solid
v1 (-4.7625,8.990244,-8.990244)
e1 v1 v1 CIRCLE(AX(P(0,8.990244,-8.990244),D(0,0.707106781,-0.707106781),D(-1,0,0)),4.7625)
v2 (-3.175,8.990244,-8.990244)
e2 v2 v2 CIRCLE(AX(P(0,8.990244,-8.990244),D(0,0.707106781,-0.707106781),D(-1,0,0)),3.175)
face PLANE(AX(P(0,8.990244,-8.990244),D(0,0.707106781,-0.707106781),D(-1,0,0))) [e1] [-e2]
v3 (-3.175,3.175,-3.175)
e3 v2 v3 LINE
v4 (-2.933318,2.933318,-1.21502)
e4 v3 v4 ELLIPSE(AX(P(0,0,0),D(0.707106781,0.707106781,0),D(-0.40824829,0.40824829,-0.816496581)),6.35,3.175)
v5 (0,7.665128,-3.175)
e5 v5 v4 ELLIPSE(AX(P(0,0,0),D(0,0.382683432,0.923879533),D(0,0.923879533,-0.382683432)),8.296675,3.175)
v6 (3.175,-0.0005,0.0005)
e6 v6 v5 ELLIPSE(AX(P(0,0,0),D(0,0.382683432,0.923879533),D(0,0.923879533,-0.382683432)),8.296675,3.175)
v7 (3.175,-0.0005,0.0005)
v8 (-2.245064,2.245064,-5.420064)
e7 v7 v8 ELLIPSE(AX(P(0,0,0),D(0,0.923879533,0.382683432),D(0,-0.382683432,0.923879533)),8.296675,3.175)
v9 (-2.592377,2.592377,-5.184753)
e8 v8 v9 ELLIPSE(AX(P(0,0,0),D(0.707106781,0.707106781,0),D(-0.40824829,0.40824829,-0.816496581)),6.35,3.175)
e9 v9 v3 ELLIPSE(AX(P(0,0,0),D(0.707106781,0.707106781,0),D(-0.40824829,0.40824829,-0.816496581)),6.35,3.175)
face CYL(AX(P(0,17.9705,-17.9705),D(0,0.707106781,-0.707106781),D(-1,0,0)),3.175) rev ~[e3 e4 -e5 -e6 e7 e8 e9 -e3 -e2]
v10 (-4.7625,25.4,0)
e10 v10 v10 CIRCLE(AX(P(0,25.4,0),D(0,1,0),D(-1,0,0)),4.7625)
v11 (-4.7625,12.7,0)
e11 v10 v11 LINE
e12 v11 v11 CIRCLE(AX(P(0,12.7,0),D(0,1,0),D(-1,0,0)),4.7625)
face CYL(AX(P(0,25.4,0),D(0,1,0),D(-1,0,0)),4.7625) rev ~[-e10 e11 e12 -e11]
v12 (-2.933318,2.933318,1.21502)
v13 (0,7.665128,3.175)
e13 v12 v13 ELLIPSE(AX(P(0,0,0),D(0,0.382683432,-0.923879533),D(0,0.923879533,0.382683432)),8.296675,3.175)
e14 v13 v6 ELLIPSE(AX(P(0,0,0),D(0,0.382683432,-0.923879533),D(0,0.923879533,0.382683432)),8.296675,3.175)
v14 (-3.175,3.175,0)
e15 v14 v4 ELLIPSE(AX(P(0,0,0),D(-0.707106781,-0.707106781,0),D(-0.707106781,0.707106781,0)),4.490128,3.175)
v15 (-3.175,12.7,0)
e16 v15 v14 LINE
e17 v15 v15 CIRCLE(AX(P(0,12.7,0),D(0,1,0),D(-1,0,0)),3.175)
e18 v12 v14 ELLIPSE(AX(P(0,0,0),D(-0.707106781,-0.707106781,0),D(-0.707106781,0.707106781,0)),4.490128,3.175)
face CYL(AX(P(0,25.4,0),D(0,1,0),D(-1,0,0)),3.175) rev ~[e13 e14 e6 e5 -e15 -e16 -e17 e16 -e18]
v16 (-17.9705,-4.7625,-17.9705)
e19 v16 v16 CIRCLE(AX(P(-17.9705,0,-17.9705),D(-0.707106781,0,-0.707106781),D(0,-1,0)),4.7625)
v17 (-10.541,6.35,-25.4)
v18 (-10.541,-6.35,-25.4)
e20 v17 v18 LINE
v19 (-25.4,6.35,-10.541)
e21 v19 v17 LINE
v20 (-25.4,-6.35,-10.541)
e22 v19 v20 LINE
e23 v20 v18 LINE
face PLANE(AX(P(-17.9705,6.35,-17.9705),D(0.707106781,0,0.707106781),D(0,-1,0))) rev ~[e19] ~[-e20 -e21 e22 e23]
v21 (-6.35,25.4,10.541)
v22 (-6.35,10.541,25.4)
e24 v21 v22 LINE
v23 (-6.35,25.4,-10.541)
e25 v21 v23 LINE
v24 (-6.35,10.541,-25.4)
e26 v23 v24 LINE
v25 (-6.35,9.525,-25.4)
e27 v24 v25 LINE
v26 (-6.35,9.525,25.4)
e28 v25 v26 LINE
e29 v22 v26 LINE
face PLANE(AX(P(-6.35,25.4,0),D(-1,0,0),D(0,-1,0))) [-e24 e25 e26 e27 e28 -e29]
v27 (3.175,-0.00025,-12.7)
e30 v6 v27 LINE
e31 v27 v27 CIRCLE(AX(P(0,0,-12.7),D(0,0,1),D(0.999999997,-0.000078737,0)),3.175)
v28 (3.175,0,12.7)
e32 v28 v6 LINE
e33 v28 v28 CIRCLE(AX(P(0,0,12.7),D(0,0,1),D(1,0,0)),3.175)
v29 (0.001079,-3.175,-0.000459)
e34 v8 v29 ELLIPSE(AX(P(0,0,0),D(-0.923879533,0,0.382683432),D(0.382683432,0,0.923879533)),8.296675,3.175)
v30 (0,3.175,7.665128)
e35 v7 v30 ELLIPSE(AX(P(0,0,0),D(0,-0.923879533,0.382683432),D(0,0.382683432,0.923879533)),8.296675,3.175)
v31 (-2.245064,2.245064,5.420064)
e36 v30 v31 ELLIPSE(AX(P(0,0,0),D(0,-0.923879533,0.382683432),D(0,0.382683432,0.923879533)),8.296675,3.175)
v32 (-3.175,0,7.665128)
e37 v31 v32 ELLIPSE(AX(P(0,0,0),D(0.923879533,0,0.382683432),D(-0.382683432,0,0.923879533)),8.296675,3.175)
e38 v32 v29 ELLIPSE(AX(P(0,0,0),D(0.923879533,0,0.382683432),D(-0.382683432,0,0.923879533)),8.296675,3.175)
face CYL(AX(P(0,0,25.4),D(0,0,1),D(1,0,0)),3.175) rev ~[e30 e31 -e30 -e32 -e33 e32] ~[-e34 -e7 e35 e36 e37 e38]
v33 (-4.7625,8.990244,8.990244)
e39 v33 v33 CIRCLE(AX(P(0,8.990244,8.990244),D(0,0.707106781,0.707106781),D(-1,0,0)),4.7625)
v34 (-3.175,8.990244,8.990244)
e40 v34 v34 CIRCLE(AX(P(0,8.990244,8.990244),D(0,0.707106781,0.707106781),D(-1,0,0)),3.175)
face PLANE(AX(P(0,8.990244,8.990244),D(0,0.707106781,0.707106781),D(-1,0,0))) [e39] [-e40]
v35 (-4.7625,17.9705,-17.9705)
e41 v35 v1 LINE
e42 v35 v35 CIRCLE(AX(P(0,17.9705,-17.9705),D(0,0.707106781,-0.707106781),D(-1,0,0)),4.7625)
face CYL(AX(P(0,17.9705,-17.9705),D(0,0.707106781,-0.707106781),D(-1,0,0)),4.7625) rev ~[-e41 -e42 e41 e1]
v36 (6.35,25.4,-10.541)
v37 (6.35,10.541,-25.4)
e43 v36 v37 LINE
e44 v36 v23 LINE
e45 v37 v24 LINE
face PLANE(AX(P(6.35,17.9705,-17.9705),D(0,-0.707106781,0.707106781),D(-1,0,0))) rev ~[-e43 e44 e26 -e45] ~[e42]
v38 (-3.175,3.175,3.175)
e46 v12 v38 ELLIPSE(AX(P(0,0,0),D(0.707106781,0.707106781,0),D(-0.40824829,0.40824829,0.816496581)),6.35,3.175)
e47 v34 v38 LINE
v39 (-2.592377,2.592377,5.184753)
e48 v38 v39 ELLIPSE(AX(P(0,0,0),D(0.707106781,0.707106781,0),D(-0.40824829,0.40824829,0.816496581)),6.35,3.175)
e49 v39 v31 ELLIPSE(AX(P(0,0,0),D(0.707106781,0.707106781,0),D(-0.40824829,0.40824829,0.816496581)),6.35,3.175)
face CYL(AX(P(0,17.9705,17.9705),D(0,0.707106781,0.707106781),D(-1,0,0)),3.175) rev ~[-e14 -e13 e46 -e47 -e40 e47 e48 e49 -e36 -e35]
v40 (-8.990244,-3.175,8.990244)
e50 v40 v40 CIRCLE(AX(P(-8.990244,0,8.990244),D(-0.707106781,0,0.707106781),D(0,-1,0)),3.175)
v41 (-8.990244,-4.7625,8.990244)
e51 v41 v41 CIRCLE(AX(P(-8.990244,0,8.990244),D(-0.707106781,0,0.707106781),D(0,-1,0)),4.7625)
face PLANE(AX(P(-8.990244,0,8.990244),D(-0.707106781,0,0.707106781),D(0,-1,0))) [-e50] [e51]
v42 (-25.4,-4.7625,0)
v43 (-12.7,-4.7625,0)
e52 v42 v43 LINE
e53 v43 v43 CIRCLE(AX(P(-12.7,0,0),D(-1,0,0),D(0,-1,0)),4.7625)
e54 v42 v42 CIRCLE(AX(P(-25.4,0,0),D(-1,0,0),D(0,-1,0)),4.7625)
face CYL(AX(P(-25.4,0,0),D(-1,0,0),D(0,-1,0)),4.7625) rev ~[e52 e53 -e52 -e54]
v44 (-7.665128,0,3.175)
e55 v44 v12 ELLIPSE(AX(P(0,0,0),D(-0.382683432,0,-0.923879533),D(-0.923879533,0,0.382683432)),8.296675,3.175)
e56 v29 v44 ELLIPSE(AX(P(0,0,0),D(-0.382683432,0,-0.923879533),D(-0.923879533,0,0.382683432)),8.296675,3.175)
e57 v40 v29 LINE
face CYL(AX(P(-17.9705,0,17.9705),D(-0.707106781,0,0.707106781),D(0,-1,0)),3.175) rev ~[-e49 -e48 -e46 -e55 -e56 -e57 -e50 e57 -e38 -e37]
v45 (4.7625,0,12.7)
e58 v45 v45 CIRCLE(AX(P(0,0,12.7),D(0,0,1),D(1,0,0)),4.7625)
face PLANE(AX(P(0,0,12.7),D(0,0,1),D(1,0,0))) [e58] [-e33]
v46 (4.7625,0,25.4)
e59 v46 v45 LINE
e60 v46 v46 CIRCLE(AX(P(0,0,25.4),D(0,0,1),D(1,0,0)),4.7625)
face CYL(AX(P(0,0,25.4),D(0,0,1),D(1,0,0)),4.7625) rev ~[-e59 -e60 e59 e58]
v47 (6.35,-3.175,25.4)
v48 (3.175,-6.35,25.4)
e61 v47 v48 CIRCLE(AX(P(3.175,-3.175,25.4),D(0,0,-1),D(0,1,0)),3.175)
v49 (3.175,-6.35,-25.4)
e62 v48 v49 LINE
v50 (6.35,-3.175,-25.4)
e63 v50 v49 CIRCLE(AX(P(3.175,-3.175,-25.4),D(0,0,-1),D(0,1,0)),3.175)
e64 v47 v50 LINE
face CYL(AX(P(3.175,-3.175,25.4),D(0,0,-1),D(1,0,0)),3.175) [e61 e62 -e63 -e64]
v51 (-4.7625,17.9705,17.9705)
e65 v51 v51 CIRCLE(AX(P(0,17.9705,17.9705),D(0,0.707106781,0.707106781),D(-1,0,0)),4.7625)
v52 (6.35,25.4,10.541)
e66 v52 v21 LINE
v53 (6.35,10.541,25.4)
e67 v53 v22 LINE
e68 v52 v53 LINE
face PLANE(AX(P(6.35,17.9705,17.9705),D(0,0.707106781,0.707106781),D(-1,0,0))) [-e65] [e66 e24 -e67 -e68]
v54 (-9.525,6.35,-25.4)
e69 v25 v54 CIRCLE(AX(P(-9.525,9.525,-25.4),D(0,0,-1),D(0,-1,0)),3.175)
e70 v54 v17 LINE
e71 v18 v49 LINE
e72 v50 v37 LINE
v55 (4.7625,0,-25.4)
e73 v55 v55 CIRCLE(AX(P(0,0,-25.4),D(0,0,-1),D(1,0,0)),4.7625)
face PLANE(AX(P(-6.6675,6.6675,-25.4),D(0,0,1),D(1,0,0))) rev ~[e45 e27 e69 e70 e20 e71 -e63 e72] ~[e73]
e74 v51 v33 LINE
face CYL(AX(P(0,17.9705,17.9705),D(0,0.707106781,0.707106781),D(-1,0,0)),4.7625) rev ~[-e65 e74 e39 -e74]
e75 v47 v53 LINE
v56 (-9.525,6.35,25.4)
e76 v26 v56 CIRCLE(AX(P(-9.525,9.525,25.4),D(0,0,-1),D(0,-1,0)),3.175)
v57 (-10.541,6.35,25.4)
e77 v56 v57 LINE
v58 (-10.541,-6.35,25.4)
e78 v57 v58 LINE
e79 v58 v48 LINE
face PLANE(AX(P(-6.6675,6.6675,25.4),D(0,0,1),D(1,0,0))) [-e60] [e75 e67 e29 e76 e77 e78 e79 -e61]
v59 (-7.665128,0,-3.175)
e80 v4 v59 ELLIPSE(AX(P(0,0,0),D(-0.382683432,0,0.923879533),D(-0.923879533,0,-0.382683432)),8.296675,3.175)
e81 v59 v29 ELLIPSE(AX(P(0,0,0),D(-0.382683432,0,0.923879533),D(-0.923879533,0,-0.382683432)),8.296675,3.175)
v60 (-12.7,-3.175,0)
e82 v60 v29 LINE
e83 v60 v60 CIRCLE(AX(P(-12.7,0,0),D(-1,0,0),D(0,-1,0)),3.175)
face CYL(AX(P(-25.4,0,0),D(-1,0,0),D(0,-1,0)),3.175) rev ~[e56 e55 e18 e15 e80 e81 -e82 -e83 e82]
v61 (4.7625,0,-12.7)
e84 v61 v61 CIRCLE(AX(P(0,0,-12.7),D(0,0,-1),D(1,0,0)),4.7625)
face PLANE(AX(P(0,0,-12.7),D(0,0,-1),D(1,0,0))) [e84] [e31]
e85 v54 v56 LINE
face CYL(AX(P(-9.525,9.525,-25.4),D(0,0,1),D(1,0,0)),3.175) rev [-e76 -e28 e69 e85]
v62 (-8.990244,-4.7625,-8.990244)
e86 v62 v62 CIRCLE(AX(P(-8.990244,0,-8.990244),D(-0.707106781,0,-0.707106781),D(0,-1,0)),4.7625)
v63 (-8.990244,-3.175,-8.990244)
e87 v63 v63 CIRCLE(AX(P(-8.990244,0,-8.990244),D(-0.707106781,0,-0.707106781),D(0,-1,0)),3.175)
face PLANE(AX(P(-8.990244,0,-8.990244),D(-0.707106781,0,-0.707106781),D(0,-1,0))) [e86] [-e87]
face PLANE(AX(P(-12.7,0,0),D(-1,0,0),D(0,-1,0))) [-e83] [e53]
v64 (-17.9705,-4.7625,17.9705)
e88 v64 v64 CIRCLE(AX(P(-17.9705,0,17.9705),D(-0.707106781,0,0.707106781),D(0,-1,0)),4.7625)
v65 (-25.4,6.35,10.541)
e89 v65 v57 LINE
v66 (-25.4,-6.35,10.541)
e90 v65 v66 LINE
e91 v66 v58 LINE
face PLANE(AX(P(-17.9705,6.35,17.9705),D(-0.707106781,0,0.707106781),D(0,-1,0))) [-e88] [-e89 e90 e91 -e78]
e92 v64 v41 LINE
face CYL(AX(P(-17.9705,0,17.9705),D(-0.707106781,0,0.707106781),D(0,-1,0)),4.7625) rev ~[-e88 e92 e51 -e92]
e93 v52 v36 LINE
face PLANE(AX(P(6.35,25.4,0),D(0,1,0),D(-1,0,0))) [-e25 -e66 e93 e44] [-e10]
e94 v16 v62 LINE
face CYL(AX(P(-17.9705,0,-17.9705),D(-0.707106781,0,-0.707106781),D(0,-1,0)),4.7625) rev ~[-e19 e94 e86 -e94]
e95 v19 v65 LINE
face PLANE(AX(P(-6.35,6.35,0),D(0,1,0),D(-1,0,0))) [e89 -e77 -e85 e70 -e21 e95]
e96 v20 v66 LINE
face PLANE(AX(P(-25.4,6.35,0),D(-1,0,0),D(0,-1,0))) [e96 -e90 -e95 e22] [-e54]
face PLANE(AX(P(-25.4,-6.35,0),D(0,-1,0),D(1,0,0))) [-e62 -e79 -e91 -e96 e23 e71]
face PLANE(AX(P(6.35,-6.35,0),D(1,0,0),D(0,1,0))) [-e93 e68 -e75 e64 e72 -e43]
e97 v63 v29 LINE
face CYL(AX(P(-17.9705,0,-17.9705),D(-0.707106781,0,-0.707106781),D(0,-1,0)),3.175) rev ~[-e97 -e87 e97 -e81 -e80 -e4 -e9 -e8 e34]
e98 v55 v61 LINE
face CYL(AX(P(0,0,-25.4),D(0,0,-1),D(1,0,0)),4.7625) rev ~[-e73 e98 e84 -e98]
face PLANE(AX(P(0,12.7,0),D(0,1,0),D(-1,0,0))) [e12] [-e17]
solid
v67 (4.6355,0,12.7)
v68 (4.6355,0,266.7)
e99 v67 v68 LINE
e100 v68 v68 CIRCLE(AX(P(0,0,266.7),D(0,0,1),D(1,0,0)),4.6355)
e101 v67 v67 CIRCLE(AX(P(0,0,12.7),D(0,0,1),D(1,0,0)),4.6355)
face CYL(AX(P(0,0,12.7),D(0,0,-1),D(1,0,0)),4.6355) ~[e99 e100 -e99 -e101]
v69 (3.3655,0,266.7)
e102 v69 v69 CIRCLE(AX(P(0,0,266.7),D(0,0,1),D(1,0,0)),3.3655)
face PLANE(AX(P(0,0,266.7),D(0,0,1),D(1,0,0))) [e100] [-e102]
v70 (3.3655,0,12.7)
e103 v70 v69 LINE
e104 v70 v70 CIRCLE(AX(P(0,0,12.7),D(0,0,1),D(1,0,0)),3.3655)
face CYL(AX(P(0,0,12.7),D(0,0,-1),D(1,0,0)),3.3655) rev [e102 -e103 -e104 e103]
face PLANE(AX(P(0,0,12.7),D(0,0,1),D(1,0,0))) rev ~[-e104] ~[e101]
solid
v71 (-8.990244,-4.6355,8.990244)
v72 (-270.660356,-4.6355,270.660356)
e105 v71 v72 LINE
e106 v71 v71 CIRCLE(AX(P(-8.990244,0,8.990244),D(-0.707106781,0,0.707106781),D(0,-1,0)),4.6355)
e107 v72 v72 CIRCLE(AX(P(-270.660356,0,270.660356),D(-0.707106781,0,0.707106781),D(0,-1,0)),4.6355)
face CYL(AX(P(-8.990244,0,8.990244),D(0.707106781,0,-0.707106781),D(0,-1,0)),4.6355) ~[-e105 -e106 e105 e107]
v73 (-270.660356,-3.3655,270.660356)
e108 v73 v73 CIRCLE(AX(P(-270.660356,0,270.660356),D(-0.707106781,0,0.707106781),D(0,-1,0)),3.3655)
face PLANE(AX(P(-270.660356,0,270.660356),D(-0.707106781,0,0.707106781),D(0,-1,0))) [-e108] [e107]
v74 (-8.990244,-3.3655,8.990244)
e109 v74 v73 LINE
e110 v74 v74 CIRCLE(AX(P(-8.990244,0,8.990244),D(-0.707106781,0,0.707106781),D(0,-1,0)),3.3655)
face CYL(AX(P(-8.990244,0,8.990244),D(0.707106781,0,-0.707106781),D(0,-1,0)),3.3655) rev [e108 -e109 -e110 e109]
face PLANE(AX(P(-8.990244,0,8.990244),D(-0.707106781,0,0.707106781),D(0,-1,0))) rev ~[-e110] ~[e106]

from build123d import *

# Parameters (mm, degrees)
F1_DEPTH  = 25.4
F2_SIZE   = 14.859
F3_R      = 3.175
F4_DEPTH  = 50.801
F5_R      = 3.175
F6_DEPTH  = 25.401
F7_R      = 3.175
F8_DEPTH  = 25.401
F9_R      = 3.175
F10_DEPTH = 25.4151248226
F11_R     = 3.175
F12_DEPTH = 25.4158319294
F13_R     = 3.175
F14_DEPTH = 25.4151248226
F15_R     = 3.175
F16_DEPTH = 25.4155629873
F17_R     = 3.175
F18_R     = 3.175
F19_R     = 4.7625
F20_DEPTH = 12.7
F21_R     = 4.7625
F22_DEPTH = 12.7
F23_R     = 4.7625
F24_DEPTH = 12.7
F25_R     = 4.7625
F26_DEPTH = 12.7
F27_R     = 4.7625
F28_DEPTH = 12.7
F29_R     = 4.7625
F30_DEPTH = 12.7
F31_R     = 4.7625
F32_DEPTH = 12.7
F33_R     = 4.7625
F36_DEPTH = 12.7
F37_R     = 4.6355
F37_R_2   = 3.3655
F38_DEPTH = 254
F39_R     = 4.6355
F39_R_2   = 3.3655
F40_DEPTH = 370.0574209815


# Not quite as in the source:
# - a variable given as a bare number and used for a length is read in inches; the dataset says mm whatever the document's units were


with BuildPart() as f1:
    # F0 (on Top) → F1 (new body, symmetric)
    with BuildSketch(Plane.XY):
        Polygon((-6.35, 25.4), (-6.35, 6.35), (-25.4, 6.35), (-25.4, -6.35), (6.35, -6.35), (6.35, 25.4), align=None)
    extrude(amount=F1_DEPTH, both=True)

    # F2
    f2_edges = [f1.edges().sort_by_distance(p)[0] for p in [
        (-25.4, 0, 25.4),
        (-25.4, 0, -25.4),
        (0, 25.4, -25.4),
        (0, 25.4, 25.4),
    ]]
    chamfer(f2_edges, length=F2_SIZE)

    # F3 (on face) → F4 (cut, through all)
    with BuildSketch(Plane.XY.offset(25.4)):
        Circle(F3_R)
    extrude(amount=-F4_DEPTH, mode=Mode.SUBTRACT)

    # F5 (on face) → F6 (cut, through all)
    with BuildSketch(Plane(origin=(-25.4, 0, 0), x_dir=(0, -1, 0), z_dir=(-1, 0, 0))):
        Circle(F5_R)
    extrude(amount=-F6_DEPTH, mode=Mode.SUBTRACT)

    # F7 (on face) → F8 (cut, through all)
    with BuildSketch(Plane(origin=(0, 25.4, 0), x_dir=(-1, 0, 0), z_dir=(0, 1, 0))):
        Circle(F7_R)
    extrude(amount=-F8_DEPTH, mode=Mode.SUBTRACT)

    # F9 (on face) → F10 (cut, through all)
    with BuildSketch(Plane(origin=(0, 17.9705, 17.9705), x_dir=(-1, 0, 0), z_dir=(0, 0.7071067812, 0.7071067812))):
        Circle(F9_R)
    extrude(amount=-F10_DEPTH, mode=Mode.SUBTRACT)

    # F11 (on face) → F12 (cut, through all)
    with BuildSketch(Plane(origin=(-17.9705, 0, 17.9705), x_dir=(0, -1, 0), z_dir=(-0.7071067812, 0, 0.7071067812))):
        Circle(F11_R)
    extrude(amount=-F12_DEPTH, mode=Mode.SUBTRACT)

    # F13 (on face) → F14 (cut, through all)
    with BuildSketch(Plane(origin=(0, 17.9705, -17.9705), x_dir=(-1, 0, 0), z_dir=(0, 0.7071067812, -0.7071067812))):
        Circle(F13_R)
    extrude(amount=-F14_DEPTH, mode=Mode.SUBTRACT)

    # F15 (on face) → F16 (cut, through all)
    with BuildSketch(Plane(origin=(-17.9705, 0, -17.9705), x_dir=(0, -1, 0), z_dir=(-0.7071067812, 0, -0.7071067812))):
        Circle(F15_R)
    extrude(amount=-F16_DEPTH, mode=Mode.SUBTRACT)

    # F17
    f17_edges = [f1.edges().sort_by_distance(p)[0] for p in [
        (-6.35, 6.35, 0),
    ]]
    fillet(f17_edges, radius=F17_R)

    # F18
    f18_edges = [f1.edges().sort_by_distance(p)[0] for p in [
        (6.35, -6.35, 0),
    ]]
    fillet(f18_edges, radius=F18_R)

    # F19 (on face) → F20 (cut)
    with BuildSketch(Plane(origin=(0, 0, -25.4), x_dir=(1, 0, 0), z_dir=(0, 0, -1))):
        Circle(F19_R)
    extrude(amount=-F20_DEPTH, mode=Mode.SUBTRACT)

    # F21 (on face) → F22 (cut)
    with BuildSketch(Plane.XY.offset(25.4)):
        Circle(F21_R)
    extrude(amount=-F22_DEPTH, mode=Mode.SUBTRACT)

    # F23 (on face) → F24 (cut)
    with BuildSketch(Plane(origin=(-25.4, 0, 0), x_dir=(0, -1, 0), z_dir=(-1, 0, 0))):
        Circle(F23_R)
    extrude(amount=-F24_DEPTH, mode=Mode.SUBTRACT)

    # F25 (on face) → F26 (cut)
    with BuildSketch(Plane(origin=(0, 25.4, 0), x_dir=(-1, 0, 0), z_dir=(0, 1, 0))):
        Circle(F25_R)
    extrude(amount=-F26_DEPTH, mode=Mode.SUBTRACT)

    # F27 (on face) → F28 (cut)
    with BuildSketch(Plane(origin=(-17.9705, 0, 17.9705), x_dir=(0, -1, 0), z_dir=(-0.7071067812, 0, 0.7071067812))):
        Circle(F27_R)
    extrude(amount=-F28_DEPTH, mode=Mode.SUBTRACT)

    # F29 (on face) → F30 (cut)
    with BuildSketch(Plane(origin=(0, 17.9705, 17.9705), x_dir=(-1, 0, 0), z_dir=(0, 0.7071067812, 0.7071067812))):
        Circle(F29_R)
    extrude(amount=-F30_DEPTH, mode=Mode.SUBTRACT)

    # F31 (on face) → F32 (cut)
    with BuildSketch(Plane(origin=(0, 17.9705, -17.9705), x_dir=(-1, 0, 0), z_dir=(0, 0.7071067812, -0.7071067812))):
        Circle(F31_R)
    extrude(amount=-F32_DEPTH, mode=Mode.SUBTRACT)

    # F33 (on face) → F36 (cut)
    with BuildSketch(Plane(origin=(-17.9705, 0, -17.9705), x_dir=(0, -1, 0), z_dir=(-0.7071067812, 0, -0.7071067812))):
        Circle(F33_R)
    extrude(amount=-F36_DEPTH, mode=Mode.SUBTRACT)


with BuildPart() as f38:
    # F37 (on face) → F38 (new body)
    with BuildSketch(Plane.XY.offset(12.7)):
        Circle(F37_R)
        Circle(F37_R_2, mode=Mode.SUBTRACT)
    extrude(amount=F38_DEPTH)


with BuildPart() as f40:
    # F39 (on face) → F40 (new body)
    with BuildSketch(Plane(origin=(-8.9902438789, 0, 8.9902438789), x_dir=(0, -1, 0), z_dir=(-0.7071067812, 0, 0.7071067812))):
        Circle(F39_R)
        Circle(F39_R_2, mode=Mode.SUBTRACT)
    extrude(amount=F40_DEPTH)


solid = Compound([f1.part, f38.part, f40.part])
